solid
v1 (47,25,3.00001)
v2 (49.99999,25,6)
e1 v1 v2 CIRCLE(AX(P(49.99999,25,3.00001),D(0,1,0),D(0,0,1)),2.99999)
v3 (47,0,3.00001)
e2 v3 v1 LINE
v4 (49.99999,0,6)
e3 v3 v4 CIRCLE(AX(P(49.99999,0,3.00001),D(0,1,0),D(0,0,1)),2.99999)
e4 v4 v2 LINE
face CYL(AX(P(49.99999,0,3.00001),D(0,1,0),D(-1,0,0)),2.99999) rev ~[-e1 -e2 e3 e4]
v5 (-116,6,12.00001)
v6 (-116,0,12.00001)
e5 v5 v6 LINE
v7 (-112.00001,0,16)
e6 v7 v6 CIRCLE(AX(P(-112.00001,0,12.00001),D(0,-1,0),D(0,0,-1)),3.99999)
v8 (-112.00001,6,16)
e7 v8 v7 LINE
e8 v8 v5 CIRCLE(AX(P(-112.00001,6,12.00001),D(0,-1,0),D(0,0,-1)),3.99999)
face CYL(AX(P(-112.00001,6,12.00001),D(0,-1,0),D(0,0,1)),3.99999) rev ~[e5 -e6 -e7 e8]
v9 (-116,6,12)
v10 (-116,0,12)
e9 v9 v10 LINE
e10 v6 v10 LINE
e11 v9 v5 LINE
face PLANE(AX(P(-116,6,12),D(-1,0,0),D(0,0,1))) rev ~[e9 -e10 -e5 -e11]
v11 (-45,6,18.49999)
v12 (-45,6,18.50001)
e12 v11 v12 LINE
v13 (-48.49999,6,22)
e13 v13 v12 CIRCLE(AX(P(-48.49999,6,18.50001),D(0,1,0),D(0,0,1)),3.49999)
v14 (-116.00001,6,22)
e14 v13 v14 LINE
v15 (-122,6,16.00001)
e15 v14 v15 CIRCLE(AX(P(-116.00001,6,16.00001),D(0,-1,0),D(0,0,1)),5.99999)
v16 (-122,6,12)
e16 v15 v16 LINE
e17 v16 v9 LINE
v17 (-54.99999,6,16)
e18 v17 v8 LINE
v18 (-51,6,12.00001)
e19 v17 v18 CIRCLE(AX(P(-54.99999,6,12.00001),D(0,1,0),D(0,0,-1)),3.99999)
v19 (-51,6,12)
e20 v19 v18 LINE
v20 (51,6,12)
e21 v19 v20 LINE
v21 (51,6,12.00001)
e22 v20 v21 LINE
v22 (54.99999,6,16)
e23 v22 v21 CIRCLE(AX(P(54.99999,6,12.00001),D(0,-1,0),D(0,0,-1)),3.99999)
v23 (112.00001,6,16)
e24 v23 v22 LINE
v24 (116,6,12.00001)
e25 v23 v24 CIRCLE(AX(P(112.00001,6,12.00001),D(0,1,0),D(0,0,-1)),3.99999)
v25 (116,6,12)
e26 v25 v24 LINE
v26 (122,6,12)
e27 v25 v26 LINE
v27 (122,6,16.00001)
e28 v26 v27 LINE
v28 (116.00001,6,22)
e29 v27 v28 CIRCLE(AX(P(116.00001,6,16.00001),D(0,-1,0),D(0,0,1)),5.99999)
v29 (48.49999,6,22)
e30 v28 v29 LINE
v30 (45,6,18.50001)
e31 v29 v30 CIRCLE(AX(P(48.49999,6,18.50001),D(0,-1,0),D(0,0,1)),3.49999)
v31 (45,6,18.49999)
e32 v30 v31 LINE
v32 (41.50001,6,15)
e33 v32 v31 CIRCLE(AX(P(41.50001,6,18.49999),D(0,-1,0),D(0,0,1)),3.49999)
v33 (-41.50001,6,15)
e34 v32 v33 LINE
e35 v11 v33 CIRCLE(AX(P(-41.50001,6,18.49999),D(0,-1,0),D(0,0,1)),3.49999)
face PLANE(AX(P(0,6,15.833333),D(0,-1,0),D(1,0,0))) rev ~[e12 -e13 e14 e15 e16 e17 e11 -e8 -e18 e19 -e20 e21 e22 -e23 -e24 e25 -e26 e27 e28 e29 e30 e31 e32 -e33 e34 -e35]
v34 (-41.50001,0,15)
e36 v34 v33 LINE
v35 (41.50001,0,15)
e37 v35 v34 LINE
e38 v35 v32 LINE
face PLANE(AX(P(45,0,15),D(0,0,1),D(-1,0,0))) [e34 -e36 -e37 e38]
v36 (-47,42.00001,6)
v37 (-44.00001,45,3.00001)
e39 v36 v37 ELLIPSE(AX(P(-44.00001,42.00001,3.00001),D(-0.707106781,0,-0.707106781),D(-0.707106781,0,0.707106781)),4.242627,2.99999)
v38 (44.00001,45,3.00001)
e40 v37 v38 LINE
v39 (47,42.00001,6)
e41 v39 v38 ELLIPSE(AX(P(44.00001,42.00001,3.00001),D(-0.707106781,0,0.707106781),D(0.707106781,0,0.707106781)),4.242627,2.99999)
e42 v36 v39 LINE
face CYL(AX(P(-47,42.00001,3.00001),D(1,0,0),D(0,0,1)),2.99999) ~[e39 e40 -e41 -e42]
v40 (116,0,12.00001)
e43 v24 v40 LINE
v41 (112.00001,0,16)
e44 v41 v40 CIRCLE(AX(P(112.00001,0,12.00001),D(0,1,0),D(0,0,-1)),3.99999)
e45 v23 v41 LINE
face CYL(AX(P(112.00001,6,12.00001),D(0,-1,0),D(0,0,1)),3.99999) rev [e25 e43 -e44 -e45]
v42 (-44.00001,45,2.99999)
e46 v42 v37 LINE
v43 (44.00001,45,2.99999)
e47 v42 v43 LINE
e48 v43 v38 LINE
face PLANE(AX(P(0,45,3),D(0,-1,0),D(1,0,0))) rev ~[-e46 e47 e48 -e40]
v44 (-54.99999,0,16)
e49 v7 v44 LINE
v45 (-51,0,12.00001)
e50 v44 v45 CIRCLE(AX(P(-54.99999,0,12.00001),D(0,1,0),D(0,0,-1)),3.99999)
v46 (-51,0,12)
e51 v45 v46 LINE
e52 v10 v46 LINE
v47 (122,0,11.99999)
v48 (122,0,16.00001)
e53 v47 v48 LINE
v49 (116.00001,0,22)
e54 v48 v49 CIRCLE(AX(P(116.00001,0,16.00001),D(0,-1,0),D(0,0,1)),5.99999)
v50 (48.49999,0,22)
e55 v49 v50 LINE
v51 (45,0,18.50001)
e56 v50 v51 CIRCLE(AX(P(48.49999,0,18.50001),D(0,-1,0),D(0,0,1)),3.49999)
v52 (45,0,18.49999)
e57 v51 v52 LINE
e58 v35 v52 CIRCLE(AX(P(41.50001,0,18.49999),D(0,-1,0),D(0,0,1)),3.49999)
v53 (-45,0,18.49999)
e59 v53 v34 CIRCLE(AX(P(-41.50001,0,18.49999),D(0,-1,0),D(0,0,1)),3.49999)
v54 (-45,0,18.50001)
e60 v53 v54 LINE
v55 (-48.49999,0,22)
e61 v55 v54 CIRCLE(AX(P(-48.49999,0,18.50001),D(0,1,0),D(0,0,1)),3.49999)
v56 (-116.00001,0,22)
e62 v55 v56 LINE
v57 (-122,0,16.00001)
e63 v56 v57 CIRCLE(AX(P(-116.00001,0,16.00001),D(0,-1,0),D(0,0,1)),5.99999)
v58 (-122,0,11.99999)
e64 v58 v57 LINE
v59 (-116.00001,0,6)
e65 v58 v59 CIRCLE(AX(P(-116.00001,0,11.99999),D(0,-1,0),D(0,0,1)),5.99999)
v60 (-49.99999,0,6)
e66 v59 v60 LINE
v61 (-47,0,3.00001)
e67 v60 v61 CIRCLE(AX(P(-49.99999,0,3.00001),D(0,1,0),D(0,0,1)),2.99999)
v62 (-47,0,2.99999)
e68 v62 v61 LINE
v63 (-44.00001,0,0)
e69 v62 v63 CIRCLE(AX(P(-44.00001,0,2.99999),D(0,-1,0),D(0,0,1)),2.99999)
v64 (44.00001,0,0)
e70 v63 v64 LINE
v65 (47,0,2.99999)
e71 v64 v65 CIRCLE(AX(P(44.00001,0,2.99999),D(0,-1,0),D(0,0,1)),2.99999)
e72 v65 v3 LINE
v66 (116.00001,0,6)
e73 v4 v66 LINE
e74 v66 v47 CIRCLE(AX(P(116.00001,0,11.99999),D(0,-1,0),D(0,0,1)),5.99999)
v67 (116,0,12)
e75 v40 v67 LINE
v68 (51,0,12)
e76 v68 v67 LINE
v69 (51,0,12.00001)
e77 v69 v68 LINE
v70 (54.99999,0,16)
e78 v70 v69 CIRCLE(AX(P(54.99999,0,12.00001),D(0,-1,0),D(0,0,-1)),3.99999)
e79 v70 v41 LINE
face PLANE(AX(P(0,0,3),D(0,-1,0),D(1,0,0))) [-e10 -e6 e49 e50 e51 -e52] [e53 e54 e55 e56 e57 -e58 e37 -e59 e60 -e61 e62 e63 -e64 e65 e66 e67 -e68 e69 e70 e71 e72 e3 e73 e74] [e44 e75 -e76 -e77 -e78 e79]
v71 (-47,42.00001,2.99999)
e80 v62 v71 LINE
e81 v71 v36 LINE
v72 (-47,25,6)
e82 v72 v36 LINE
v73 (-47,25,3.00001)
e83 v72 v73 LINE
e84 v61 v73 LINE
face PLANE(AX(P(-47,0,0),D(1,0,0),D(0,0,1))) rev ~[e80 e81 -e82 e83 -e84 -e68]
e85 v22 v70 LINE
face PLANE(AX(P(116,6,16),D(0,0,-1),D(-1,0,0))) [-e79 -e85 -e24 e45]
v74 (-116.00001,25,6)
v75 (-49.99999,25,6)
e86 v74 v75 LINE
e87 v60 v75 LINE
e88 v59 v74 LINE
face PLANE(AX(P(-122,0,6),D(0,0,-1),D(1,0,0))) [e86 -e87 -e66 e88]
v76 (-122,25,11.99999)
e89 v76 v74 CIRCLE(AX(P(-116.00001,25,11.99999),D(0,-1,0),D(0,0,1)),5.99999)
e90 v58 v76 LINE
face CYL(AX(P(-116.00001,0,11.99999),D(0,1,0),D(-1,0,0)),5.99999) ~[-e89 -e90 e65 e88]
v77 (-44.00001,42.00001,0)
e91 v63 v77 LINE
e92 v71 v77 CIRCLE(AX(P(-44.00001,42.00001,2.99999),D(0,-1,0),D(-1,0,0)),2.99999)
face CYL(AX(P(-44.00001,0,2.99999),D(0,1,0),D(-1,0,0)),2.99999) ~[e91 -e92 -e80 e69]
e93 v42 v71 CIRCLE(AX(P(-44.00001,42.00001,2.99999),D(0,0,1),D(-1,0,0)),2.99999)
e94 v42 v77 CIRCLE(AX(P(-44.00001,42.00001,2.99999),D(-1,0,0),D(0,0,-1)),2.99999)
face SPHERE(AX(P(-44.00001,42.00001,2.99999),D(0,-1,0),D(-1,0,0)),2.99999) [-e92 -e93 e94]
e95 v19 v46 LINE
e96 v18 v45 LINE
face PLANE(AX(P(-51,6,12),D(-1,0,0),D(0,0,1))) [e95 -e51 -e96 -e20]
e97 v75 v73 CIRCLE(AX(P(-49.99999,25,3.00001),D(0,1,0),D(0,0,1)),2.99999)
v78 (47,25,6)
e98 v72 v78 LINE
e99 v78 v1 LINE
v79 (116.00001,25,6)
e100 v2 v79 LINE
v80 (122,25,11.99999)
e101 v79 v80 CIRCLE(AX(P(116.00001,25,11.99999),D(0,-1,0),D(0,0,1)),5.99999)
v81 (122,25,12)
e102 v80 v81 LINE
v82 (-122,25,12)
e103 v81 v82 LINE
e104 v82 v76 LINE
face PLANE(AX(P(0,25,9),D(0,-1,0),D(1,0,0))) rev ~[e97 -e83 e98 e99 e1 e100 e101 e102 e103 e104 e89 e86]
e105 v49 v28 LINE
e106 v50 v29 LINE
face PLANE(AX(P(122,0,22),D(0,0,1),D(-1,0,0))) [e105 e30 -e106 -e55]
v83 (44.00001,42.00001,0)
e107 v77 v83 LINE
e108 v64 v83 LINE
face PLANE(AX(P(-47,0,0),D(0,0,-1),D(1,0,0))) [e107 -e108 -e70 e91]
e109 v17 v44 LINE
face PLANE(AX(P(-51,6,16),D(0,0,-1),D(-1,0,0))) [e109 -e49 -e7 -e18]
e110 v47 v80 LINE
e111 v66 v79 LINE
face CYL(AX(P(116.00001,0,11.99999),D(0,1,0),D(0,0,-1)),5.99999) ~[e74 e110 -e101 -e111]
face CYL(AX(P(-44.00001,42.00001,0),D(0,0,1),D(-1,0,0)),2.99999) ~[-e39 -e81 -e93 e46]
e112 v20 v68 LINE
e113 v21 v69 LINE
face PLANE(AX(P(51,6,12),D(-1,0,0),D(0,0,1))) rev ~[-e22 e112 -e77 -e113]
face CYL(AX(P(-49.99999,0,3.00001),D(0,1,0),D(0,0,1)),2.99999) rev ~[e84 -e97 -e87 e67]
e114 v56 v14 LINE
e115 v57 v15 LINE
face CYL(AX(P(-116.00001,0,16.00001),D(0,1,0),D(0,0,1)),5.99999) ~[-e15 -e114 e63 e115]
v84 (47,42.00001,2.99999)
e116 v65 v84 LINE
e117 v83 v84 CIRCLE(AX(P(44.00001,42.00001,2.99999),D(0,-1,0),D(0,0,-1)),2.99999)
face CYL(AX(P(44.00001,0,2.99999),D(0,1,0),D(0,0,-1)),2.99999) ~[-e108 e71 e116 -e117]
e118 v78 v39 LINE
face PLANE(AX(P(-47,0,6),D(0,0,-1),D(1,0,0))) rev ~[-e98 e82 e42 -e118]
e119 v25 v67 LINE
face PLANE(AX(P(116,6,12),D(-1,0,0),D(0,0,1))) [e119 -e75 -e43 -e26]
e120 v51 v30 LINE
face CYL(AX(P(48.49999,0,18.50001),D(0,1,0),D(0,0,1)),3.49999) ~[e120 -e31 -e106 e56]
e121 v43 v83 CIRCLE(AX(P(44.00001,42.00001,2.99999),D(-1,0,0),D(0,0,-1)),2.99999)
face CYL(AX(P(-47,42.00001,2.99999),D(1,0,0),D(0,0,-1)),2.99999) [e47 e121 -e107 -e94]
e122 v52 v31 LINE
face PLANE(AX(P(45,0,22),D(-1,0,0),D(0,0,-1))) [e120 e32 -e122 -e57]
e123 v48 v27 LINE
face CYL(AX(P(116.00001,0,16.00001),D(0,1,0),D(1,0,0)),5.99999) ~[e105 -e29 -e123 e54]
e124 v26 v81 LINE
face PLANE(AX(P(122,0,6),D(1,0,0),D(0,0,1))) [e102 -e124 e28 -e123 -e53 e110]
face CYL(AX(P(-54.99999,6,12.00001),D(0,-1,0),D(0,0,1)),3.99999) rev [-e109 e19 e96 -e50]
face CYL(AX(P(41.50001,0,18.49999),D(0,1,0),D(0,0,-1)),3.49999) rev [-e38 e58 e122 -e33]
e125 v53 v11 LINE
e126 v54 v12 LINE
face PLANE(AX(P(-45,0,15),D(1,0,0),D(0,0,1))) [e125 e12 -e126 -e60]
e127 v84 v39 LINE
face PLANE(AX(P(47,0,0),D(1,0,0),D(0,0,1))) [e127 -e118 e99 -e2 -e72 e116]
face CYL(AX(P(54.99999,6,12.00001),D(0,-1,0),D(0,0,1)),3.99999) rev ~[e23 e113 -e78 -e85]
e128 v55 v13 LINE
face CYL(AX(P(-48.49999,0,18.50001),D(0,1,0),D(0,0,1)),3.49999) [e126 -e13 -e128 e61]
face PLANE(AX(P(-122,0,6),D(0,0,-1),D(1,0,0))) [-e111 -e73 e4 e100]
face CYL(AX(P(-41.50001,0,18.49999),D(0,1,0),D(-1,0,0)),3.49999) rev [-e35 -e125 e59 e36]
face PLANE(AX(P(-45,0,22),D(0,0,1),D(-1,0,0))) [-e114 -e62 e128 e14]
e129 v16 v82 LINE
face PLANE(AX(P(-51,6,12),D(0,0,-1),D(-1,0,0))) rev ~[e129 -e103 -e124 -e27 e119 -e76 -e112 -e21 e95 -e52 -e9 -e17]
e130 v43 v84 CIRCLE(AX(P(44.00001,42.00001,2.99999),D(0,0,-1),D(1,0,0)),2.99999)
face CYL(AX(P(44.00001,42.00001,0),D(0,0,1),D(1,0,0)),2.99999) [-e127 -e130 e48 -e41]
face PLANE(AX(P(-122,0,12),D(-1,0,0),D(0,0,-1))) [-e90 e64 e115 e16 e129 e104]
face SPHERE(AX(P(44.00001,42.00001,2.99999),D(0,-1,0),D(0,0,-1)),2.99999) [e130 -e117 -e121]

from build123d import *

# Parameters (mm, degrees)
F1_DEPTH = 6
F2_DEPTH = 25
F0_W     = 94
F0_H     = 6
F3_DEPTH = 45
F4_W     = 65
F4_H     = 4
F5_DEPTH = 25
F6_R     = 3.99999
F7_R     = 3.49999
F8_R     = 5.99999
F9_R     = 2.99999


# Not quite as in the source:
# - two fillets or chamfers of one size are made in one step
# - a fillet or chamfer is up to 0.001 mm smaller than in the source, because OpenCascade refuses the exact size


with BuildPart() as f1:
    # F0 (on Front) → F1 (new body)
    with BuildSketch(Plane.XZ):
        Polygon((-122, 22), (-122, 12), (122, 12), (122, 22), (45, 22), (45, 15), (-45, 15), (-45, 22), align=None)
    extrude(amount=-F1_DEPTH)

    # F0 (on Front) → F2 (join)
    with BuildSketch(Plane.XZ):
        Polygon((-122, 12), (-122, 6), (-47, 6), (47, 6), (122, 6), (122, 12), align=None)
    extrude(amount=-F2_DEPTH)

    # F0 (on Front) → F3 (join, through all)
    with BuildSketch(Plane.XZ):
        with Locations((0, 3)):
            Rectangle(F0_W, F0_H)
    extrude(amount=-F3_DEPTH)

    # F4 (on face) → F5 (cut)
    with BuildSketch(Plane(origin=(0, 6, 0), x_dir=(-1, 0, 0), z_dir=(0, 1, 0))):
        with Locations((83.5, 14)):
            Rectangle(F4_W, F4_H)
        with Locations((-83.5, 14)):
            Rectangle(F4_W, F4_H)
    extrude(amount=-F5_DEPTH, mode=Mode.SUBTRACT)

    # F6 (radius 4 in the source; OpenCascade refuses exactly that, so slightly less here)
    f6_edges = [f1.edges().sort_by_distance(p)[0] for p in [
        (-51, 3, 16),
        (-116, 3, 16),
        (51, 3, 16),
        (116, 3, 16),
    ]]
    fillet(f6_edges, radius=F6_R)

    # F7 (radius 3.5 in the source; OpenCascade refuses exactly that, so slightly less here)
    f7_edges = [f1.edges().sort_by_distance(p)[0] for p in [
        (-45, 3, 15),
        (-45, 3, 22),
        (45, 3, 15),
        (45, 3, 22),
    ]]
    fillet(f7_edges, radius=F7_R)

    # F8 (radius 6 in the source; OpenCascade refuses exactly that, so slightly less here)
    f8_edges = [f1.edges().sort_by_distance(p)[0] for p in [
        (-122, 3, 22),
        (122, 3, 22),
        (-122, 12.5, 6),
        (122, 12.5, 6),
    ]]
    fillet(f8_edges, radius=F8_R)

    # F9 (radius 3 in the source; OpenCascade refuses exactly that, so slightly less here)
    f9_edges = [f1.edges().sort_by_distance(p)[0] for p in [
        (47, 12.5, 6),
        (47, 22.5, 0),
        (-47, 22.5, 0),
        (-47, 12.5, 6),
        (-47, 45, 3),
        (0, 45, 0),
        (47, 45, 3),
        (0, 45, 6),
    ]]
    fillet(f9_edges, radius=F9_R)


solid = f1.part
